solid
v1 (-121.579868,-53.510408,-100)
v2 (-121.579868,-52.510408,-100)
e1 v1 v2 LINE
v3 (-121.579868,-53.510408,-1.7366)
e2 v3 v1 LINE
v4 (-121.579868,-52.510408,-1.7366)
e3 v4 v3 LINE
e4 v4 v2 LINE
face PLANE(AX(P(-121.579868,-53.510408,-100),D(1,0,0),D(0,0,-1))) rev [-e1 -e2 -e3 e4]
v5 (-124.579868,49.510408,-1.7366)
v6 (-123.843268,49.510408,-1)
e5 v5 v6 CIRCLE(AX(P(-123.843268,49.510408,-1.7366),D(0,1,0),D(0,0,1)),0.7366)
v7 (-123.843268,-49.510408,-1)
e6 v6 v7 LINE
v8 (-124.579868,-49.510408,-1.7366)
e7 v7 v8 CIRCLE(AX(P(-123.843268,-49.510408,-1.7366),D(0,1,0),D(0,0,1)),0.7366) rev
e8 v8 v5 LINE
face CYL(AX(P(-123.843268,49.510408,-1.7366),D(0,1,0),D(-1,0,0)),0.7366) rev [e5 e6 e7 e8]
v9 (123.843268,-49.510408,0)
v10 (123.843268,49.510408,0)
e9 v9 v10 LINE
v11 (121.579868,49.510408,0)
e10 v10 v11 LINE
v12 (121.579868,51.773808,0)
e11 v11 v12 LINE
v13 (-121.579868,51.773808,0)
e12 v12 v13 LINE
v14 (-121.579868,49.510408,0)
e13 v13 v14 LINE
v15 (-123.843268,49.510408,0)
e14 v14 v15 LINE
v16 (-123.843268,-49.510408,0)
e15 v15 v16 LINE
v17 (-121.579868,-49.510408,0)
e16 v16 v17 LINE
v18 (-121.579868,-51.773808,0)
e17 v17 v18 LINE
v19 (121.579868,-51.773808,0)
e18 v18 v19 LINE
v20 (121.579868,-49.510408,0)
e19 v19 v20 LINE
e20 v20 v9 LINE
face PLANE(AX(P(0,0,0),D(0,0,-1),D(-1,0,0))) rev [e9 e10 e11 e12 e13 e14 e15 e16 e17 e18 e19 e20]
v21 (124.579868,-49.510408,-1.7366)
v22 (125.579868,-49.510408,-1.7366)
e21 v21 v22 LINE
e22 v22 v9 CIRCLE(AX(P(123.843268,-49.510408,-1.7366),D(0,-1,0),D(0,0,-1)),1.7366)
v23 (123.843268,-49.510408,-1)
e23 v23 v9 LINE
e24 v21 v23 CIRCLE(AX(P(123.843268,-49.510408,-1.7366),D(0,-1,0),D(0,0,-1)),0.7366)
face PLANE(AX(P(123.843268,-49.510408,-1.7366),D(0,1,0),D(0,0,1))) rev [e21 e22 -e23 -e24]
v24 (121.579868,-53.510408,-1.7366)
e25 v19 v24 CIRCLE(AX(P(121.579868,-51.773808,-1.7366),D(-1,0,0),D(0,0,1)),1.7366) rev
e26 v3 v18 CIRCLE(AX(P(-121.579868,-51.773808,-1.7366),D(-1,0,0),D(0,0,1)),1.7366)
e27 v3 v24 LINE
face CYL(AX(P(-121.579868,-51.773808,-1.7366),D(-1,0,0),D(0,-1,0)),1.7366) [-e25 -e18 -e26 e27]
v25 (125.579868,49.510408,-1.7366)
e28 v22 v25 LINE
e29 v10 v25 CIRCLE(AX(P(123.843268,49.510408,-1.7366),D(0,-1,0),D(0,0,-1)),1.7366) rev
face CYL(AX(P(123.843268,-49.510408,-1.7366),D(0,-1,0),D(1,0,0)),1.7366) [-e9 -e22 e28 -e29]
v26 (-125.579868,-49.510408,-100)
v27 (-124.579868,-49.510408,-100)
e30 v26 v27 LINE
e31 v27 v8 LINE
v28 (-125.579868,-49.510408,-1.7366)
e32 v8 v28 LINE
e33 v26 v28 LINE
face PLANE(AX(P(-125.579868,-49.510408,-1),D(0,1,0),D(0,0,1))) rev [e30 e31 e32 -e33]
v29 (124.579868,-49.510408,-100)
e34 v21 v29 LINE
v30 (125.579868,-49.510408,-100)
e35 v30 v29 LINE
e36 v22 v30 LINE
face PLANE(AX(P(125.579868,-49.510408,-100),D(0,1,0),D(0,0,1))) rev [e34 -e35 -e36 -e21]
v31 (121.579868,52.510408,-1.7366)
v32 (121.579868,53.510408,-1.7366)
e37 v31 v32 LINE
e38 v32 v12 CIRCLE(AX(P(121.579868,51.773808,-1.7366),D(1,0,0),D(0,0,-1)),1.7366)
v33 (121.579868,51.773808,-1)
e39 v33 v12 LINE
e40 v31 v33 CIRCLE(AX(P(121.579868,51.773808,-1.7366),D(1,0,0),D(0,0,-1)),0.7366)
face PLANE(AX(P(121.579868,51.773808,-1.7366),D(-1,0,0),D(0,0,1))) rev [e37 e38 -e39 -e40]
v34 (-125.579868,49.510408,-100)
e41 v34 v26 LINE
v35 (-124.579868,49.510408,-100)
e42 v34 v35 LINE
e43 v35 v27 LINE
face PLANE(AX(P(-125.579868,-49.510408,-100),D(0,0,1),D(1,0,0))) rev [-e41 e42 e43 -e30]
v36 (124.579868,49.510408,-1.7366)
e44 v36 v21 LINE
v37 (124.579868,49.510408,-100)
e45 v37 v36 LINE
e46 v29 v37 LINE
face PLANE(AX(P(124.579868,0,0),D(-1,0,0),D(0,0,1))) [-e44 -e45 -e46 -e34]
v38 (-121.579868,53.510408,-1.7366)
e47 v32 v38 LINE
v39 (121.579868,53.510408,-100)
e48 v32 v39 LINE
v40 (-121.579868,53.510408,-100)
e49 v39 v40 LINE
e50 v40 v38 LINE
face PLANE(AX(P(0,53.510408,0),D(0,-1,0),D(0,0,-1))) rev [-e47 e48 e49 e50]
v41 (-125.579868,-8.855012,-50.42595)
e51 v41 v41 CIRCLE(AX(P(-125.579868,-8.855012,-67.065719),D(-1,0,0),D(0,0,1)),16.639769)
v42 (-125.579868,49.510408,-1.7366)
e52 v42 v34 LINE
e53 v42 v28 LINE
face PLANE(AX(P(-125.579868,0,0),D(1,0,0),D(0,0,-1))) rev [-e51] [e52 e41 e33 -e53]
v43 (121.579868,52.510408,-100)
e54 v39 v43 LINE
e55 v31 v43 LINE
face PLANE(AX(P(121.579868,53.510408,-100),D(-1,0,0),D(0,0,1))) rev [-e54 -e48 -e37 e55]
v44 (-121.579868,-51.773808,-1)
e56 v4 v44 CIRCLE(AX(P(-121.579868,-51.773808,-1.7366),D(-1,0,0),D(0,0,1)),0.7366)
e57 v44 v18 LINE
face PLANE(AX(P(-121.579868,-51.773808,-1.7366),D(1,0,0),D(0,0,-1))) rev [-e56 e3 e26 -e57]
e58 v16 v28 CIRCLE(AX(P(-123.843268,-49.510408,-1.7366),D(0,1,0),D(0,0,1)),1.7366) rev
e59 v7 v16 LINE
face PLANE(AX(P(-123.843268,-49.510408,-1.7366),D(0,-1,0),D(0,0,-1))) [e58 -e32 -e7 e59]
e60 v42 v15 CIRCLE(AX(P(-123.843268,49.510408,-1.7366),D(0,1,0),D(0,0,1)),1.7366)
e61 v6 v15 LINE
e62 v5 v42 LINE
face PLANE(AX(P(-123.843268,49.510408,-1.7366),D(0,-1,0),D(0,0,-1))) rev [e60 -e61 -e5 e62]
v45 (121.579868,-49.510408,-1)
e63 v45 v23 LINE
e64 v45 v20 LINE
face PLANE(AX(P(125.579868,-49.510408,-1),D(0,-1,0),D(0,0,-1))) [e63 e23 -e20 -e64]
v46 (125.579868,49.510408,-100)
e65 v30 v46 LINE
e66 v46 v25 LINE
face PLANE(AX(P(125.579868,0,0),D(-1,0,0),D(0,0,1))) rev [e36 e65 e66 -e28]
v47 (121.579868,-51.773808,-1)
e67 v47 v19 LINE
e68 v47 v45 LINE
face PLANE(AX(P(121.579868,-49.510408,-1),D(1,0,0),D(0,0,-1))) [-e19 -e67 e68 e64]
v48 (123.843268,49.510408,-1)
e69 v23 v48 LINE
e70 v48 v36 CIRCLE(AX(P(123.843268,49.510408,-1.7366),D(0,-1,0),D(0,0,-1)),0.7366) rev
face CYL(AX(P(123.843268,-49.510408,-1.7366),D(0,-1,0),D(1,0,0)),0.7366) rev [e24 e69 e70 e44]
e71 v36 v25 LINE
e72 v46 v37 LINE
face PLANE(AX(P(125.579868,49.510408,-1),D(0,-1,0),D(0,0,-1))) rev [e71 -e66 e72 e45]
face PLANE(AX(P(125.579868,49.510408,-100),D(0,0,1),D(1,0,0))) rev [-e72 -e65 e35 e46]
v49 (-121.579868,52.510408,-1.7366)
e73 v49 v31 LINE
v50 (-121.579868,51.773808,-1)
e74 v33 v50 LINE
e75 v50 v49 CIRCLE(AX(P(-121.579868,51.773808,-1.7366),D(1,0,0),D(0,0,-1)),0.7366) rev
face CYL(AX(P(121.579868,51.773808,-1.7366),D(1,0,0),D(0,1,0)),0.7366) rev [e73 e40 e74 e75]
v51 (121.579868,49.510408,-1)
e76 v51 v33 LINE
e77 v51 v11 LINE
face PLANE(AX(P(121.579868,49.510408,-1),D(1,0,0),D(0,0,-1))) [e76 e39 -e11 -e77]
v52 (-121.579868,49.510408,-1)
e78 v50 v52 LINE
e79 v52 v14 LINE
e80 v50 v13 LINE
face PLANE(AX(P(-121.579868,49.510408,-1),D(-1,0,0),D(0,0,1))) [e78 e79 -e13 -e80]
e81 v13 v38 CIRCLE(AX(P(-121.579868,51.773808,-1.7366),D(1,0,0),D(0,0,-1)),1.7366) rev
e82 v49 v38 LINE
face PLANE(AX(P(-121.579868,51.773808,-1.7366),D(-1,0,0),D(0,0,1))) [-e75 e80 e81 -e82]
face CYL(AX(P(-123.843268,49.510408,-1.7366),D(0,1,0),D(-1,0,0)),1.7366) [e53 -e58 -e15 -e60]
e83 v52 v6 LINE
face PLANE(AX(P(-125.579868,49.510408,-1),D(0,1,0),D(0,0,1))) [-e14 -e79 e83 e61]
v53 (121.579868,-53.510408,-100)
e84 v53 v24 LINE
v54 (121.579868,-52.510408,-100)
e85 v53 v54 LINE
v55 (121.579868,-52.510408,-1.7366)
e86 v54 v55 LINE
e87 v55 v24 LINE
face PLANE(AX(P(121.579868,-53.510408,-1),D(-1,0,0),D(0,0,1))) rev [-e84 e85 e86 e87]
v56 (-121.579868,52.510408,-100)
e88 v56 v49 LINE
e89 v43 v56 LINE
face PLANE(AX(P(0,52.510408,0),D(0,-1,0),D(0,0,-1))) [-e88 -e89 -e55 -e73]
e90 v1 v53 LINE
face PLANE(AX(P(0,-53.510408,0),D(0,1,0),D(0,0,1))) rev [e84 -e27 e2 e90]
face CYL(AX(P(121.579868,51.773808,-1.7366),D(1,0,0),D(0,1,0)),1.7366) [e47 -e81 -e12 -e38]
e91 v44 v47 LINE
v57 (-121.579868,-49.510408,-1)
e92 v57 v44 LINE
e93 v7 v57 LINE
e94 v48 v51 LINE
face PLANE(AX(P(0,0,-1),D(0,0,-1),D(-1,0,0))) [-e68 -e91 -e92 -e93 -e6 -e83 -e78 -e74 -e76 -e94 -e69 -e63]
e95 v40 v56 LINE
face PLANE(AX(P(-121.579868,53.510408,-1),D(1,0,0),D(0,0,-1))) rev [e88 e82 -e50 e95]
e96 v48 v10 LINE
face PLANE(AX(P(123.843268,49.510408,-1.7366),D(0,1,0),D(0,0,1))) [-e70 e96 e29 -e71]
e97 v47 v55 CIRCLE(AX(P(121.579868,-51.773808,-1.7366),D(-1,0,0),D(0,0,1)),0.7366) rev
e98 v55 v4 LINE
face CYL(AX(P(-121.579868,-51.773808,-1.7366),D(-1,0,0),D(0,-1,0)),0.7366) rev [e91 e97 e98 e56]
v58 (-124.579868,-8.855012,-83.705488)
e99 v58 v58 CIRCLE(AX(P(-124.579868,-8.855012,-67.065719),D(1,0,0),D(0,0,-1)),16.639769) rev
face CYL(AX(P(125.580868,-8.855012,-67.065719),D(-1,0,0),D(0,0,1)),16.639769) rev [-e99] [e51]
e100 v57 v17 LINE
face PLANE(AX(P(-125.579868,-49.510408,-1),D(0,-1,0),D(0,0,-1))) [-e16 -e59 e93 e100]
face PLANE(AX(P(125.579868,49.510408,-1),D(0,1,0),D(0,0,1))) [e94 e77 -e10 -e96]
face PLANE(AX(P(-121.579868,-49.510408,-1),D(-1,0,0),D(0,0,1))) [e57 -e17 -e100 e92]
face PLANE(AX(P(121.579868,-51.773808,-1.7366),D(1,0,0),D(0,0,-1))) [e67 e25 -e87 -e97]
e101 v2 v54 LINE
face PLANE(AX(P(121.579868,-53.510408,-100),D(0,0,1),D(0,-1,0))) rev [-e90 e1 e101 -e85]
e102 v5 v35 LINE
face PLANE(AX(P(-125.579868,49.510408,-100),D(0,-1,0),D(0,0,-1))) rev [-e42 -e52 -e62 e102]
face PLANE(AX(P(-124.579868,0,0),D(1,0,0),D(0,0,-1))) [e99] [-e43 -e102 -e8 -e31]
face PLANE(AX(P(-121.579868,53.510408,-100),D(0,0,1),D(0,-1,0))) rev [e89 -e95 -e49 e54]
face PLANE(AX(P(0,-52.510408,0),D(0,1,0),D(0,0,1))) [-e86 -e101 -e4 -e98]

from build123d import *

# Parameters (mm, degrees)
SM_START                         = -1
SM_BASE_FLANGE_1_DEPTH           = 1
SM_EDGE_FLANGE_1_STRIP_W         = 5.4732
SM_EDGE_FLANGE_1_STRIP_H         = 1
SM_EDGE_FLANGE_1_STRIP_CUT_DEPTH = 243.159735698
SM_EDGE_FLANGE_1_DEPTH           = 243.159735698
SM_EDGE_FLANGE_2_STRIP_W         = 5.4732
SM_EDGE_FLANGE_2_STRIP_H         = 1
SM_EDGE_FLANGE_2_STRIP_CUT_DEPTH = 99.02081528
SM_EDGE_FLANGE_2_DEPTH           = 99.02081528
SM_EDGE_FLANGE_3_STRIP_W         = 5.4732
SM_EDGE_FLANGE_3_STRIP_H         = 1
SM_EDGE_FLANGE_3_STRIP_CUT_DEPTH = 99.02081528
SM_EDGE_FLANGE_3_DEPTH           = 99.02081528
SM_EDGE_FLANGE_4_STRIP_W         = 5.4732
SM_EDGE_FLANGE_4_STRIP_H         = 1
SM_EDGE_FLANGE_4_STRIP_CUT_DEPTH = 243.159735698
SM_EDGE_FLANGE_4_DEPTH           = 243.159735698
CUT_EXTRUDE_1_REACH              = 277.58
SKETCH_18_R                      = 16.639768722


# Read off the part's stored shape, not the designer's step: Базовая кромка1
# Sheet-metal steps are written as plain solids
with BuildPart() as part:
    # Базовая кромка1 outline → Базовая кромка1 (new body)
    with BuildSketch(Plane.XY.offset(SM_START)):
        Polygon((-121.579867849, 49.51040764), (-125.579867849, 49.51040764), (-125.579867849, -49.51040764), (-121.579867849, -49.51040764), (-121.579867849, -53.51040764), (121.579867849, -53.51040764), (121.579867849, -49.51040764), (125.579867849, -49.51040764), (125.579867849, 49.51040764), (121.579867849, 49.51040764), (121.579867849, 53.51040764), (-121.579867849, 53.51040764), align=None)
    extrude(amount=SM_BASE_FLANGE_1_DEPTH)

    # Ребро-кромка1 strip (across the edge) → Ребро-кромка1 strip cut (cut)
    with BuildSketch(Plane(origin=(-121.579867849, 53.51040764, -1), x_dir=(0, -1, 0), z_dir=(1, 0, 0))):
        with Locations((-1, -0.5)):
            Rectangle(SM_EDGE_FLANGE_1_STRIP_W, SM_EDGE_FLANGE_1_STRIP_H)
    extrude(amount=SM_EDGE_FLANGE_1_STRIP_CUT_DEPTH, mode=Mode.SUBTRACT)

    # Ребро-кромка1 section (across the edge) → Ребро-кромка1 (add)
    with BuildSketch(Plane(origin=(-121.579867849, 53.51040764, -1), x_dir=(0, -1, 0), z_dir=(1, 0, 0))):
        with BuildLine():
            Line((0, 0.7366), (0, 99))
            Line((0, 99), (1, 99))
            Line((1, 99), (1, 0.7366))
            ThreePointArc((1, 0.7366), (1.215745145, 0.215745145), (1.7366, 0))
            Line((1.7366, 0), (1.7366, -1))
            ThreePointArc((1.7366, -1), (0.508638364, -0.491361636), (0, 0.7366))
        make_face()
    extrude(amount=SM_EDGE_FLANGE_1_DEPTH)

    # Ребро-кромка2 strip (across the edge) → Ребро-кромка2 strip cut (cut)
    with BuildSketch(Plane(origin=(-125.579867849, -49.51040764, -1), x_dir=(1, 0, 0), z_dir=(0, 1, 0))):
        with Locations((-1, -0.5)):
            Rectangle(SM_EDGE_FLANGE_2_STRIP_W, SM_EDGE_FLANGE_2_STRIP_H)
    extrude(amount=SM_EDGE_FLANGE_2_STRIP_CUT_DEPTH, mode=Mode.SUBTRACT)

    # Ребро-кромка2 section (across the edge) → Ребро-кромка2 (add)
    with BuildSketch(Plane(origin=(-125.579867849, -49.51040764, -1), x_dir=(1, 0, 0), z_dir=(0, 1, 0))):
        with BuildLine():
            Line((0, 0.7366), (0, 99))
            Line((0, 99), (1, 99))
            Line((1, 99), (1, 0.7366))
            ThreePointArc((1, 0.7366), (1.215745145, 0.215745145), (1.7366, 0))
            Line((1.7366, 0), (1.7366, -1))
            ThreePointArc((1.7366, -1), (0.508638364, -0.491361636), (0, 0.7366))
        make_face()
    extrude(amount=SM_EDGE_FLANGE_2_DEPTH)

    # Ребро-кромка3 strip (across the edge) → Ребро-кромка3 strip cut (cut)
    with BuildSketch(Plane(origin=(125.579867849, 49.51040764, -1), x_dir=(-1, 0, 0), z_dir=(0, -1, 0))):
        with Locations((-1, -0.5)):
            Rectangle(SM_EDGE_FLANGE_3_STRIP_W, SM_EDGE_FLANGE_3_STRIP_H)
    extrude(amount=SM_EDGE_FLANGE_3_STRIP_CUT_DEPTH, mode=Mode.SUBTRACT)

    # Ребро-кромка3 section (across the edge) → Ребро-кромка3 (add)
    with BuildSketch(Plane(origin=(125.579867849, 49.51040764, -1), x_dir=(-1, 0, 0), z_dir=(0, -1, 0))):
        with BuildLine():
            Line((0, 0.7366), (0, 99))
            Line((0, 99), (1, 99))
            Line((1, 99), (1, 0.7366))
            ThreePointArc((1, 0.7366), (1.215745145, 0.215745145), (1.7366, 0))
            Line((1.7366, 0), (1.7366, -1))
            ThreePointArc((1.7366, -1), (0.508638364, -0.491361636), (0, 0.7366))
        make_face()
    extrude(amount=SM_EDGE_FLANGE_3_DEPTH)

    # Ребро-кромка4 strip (across the edge) → Ребро-кромка4 strip cut (cut)
    with BuildSketch(Plane(origin=(121.579867849, -53.51040764, -1), x_dir=(0, 1, 0), z_dir=(-1, 0, 0))):
        with Locations((-1, -0.5)):
            Rectangle(SM_EDGE_FLANGE_4_STRIP_W, SM_EDGE_FLANGE_4_STRIP_H)
    extrude(amount=SM_EDGE_FLANGE_4_STRIP_CUT_DEPTH, mode=Mode.SUBTRACT)

    # Ребро-кромка4 section (across the edge) → Ребро-кромка4 (add)
    with BuildSketch(Plane(origin=(121.579867849, -53.51040764, -1), x_dir=(0, 1, 0), z_dir=(-1, 0, 0))):
        with BuildLine():
            Line((0, 0.7366), (0, 99))
            Line((0, 99), (1, 99))
            Line((1, 99), (1, 0.7366))
            ThreePointArc((1, 0.7366), (1.215745145, 0.215745145), (1.7366, 0))
            Line((1.7366, 0), (1.7366, -1))
            ThreePointArc((1.7366, -1), (0.508638364, -0.491361636), (0, 0.7366))
        make_face()
    extrude(amount=SM_EDGE_FLANGE_4_DEPTH)

    # Эскиз18 → Вырез-Вытянуть1 (cut, up to next)
    with BuildSketch(Plane.ZY.offset(125.579867849), mode=Mode.PRIVATE) as cut_extrude_1_sk1:
        with Locations((-67.065719066, -8.85501242)):
            Circle(SKETCH_18_R)
    cut_extrude_1_tool1 = extrude(cut_extrude_1_sk1.sketch, amount=-CUT_EXTRUDE_1_REACH, mode=Mode.PRIVATE) & part.part
    add(cut_extrude_1_tool1.solids().sort_by_distance((-125.579868, -8.855012, -67.065719))[0], mode=Mode.SUBTRACT)


solid = part.part
